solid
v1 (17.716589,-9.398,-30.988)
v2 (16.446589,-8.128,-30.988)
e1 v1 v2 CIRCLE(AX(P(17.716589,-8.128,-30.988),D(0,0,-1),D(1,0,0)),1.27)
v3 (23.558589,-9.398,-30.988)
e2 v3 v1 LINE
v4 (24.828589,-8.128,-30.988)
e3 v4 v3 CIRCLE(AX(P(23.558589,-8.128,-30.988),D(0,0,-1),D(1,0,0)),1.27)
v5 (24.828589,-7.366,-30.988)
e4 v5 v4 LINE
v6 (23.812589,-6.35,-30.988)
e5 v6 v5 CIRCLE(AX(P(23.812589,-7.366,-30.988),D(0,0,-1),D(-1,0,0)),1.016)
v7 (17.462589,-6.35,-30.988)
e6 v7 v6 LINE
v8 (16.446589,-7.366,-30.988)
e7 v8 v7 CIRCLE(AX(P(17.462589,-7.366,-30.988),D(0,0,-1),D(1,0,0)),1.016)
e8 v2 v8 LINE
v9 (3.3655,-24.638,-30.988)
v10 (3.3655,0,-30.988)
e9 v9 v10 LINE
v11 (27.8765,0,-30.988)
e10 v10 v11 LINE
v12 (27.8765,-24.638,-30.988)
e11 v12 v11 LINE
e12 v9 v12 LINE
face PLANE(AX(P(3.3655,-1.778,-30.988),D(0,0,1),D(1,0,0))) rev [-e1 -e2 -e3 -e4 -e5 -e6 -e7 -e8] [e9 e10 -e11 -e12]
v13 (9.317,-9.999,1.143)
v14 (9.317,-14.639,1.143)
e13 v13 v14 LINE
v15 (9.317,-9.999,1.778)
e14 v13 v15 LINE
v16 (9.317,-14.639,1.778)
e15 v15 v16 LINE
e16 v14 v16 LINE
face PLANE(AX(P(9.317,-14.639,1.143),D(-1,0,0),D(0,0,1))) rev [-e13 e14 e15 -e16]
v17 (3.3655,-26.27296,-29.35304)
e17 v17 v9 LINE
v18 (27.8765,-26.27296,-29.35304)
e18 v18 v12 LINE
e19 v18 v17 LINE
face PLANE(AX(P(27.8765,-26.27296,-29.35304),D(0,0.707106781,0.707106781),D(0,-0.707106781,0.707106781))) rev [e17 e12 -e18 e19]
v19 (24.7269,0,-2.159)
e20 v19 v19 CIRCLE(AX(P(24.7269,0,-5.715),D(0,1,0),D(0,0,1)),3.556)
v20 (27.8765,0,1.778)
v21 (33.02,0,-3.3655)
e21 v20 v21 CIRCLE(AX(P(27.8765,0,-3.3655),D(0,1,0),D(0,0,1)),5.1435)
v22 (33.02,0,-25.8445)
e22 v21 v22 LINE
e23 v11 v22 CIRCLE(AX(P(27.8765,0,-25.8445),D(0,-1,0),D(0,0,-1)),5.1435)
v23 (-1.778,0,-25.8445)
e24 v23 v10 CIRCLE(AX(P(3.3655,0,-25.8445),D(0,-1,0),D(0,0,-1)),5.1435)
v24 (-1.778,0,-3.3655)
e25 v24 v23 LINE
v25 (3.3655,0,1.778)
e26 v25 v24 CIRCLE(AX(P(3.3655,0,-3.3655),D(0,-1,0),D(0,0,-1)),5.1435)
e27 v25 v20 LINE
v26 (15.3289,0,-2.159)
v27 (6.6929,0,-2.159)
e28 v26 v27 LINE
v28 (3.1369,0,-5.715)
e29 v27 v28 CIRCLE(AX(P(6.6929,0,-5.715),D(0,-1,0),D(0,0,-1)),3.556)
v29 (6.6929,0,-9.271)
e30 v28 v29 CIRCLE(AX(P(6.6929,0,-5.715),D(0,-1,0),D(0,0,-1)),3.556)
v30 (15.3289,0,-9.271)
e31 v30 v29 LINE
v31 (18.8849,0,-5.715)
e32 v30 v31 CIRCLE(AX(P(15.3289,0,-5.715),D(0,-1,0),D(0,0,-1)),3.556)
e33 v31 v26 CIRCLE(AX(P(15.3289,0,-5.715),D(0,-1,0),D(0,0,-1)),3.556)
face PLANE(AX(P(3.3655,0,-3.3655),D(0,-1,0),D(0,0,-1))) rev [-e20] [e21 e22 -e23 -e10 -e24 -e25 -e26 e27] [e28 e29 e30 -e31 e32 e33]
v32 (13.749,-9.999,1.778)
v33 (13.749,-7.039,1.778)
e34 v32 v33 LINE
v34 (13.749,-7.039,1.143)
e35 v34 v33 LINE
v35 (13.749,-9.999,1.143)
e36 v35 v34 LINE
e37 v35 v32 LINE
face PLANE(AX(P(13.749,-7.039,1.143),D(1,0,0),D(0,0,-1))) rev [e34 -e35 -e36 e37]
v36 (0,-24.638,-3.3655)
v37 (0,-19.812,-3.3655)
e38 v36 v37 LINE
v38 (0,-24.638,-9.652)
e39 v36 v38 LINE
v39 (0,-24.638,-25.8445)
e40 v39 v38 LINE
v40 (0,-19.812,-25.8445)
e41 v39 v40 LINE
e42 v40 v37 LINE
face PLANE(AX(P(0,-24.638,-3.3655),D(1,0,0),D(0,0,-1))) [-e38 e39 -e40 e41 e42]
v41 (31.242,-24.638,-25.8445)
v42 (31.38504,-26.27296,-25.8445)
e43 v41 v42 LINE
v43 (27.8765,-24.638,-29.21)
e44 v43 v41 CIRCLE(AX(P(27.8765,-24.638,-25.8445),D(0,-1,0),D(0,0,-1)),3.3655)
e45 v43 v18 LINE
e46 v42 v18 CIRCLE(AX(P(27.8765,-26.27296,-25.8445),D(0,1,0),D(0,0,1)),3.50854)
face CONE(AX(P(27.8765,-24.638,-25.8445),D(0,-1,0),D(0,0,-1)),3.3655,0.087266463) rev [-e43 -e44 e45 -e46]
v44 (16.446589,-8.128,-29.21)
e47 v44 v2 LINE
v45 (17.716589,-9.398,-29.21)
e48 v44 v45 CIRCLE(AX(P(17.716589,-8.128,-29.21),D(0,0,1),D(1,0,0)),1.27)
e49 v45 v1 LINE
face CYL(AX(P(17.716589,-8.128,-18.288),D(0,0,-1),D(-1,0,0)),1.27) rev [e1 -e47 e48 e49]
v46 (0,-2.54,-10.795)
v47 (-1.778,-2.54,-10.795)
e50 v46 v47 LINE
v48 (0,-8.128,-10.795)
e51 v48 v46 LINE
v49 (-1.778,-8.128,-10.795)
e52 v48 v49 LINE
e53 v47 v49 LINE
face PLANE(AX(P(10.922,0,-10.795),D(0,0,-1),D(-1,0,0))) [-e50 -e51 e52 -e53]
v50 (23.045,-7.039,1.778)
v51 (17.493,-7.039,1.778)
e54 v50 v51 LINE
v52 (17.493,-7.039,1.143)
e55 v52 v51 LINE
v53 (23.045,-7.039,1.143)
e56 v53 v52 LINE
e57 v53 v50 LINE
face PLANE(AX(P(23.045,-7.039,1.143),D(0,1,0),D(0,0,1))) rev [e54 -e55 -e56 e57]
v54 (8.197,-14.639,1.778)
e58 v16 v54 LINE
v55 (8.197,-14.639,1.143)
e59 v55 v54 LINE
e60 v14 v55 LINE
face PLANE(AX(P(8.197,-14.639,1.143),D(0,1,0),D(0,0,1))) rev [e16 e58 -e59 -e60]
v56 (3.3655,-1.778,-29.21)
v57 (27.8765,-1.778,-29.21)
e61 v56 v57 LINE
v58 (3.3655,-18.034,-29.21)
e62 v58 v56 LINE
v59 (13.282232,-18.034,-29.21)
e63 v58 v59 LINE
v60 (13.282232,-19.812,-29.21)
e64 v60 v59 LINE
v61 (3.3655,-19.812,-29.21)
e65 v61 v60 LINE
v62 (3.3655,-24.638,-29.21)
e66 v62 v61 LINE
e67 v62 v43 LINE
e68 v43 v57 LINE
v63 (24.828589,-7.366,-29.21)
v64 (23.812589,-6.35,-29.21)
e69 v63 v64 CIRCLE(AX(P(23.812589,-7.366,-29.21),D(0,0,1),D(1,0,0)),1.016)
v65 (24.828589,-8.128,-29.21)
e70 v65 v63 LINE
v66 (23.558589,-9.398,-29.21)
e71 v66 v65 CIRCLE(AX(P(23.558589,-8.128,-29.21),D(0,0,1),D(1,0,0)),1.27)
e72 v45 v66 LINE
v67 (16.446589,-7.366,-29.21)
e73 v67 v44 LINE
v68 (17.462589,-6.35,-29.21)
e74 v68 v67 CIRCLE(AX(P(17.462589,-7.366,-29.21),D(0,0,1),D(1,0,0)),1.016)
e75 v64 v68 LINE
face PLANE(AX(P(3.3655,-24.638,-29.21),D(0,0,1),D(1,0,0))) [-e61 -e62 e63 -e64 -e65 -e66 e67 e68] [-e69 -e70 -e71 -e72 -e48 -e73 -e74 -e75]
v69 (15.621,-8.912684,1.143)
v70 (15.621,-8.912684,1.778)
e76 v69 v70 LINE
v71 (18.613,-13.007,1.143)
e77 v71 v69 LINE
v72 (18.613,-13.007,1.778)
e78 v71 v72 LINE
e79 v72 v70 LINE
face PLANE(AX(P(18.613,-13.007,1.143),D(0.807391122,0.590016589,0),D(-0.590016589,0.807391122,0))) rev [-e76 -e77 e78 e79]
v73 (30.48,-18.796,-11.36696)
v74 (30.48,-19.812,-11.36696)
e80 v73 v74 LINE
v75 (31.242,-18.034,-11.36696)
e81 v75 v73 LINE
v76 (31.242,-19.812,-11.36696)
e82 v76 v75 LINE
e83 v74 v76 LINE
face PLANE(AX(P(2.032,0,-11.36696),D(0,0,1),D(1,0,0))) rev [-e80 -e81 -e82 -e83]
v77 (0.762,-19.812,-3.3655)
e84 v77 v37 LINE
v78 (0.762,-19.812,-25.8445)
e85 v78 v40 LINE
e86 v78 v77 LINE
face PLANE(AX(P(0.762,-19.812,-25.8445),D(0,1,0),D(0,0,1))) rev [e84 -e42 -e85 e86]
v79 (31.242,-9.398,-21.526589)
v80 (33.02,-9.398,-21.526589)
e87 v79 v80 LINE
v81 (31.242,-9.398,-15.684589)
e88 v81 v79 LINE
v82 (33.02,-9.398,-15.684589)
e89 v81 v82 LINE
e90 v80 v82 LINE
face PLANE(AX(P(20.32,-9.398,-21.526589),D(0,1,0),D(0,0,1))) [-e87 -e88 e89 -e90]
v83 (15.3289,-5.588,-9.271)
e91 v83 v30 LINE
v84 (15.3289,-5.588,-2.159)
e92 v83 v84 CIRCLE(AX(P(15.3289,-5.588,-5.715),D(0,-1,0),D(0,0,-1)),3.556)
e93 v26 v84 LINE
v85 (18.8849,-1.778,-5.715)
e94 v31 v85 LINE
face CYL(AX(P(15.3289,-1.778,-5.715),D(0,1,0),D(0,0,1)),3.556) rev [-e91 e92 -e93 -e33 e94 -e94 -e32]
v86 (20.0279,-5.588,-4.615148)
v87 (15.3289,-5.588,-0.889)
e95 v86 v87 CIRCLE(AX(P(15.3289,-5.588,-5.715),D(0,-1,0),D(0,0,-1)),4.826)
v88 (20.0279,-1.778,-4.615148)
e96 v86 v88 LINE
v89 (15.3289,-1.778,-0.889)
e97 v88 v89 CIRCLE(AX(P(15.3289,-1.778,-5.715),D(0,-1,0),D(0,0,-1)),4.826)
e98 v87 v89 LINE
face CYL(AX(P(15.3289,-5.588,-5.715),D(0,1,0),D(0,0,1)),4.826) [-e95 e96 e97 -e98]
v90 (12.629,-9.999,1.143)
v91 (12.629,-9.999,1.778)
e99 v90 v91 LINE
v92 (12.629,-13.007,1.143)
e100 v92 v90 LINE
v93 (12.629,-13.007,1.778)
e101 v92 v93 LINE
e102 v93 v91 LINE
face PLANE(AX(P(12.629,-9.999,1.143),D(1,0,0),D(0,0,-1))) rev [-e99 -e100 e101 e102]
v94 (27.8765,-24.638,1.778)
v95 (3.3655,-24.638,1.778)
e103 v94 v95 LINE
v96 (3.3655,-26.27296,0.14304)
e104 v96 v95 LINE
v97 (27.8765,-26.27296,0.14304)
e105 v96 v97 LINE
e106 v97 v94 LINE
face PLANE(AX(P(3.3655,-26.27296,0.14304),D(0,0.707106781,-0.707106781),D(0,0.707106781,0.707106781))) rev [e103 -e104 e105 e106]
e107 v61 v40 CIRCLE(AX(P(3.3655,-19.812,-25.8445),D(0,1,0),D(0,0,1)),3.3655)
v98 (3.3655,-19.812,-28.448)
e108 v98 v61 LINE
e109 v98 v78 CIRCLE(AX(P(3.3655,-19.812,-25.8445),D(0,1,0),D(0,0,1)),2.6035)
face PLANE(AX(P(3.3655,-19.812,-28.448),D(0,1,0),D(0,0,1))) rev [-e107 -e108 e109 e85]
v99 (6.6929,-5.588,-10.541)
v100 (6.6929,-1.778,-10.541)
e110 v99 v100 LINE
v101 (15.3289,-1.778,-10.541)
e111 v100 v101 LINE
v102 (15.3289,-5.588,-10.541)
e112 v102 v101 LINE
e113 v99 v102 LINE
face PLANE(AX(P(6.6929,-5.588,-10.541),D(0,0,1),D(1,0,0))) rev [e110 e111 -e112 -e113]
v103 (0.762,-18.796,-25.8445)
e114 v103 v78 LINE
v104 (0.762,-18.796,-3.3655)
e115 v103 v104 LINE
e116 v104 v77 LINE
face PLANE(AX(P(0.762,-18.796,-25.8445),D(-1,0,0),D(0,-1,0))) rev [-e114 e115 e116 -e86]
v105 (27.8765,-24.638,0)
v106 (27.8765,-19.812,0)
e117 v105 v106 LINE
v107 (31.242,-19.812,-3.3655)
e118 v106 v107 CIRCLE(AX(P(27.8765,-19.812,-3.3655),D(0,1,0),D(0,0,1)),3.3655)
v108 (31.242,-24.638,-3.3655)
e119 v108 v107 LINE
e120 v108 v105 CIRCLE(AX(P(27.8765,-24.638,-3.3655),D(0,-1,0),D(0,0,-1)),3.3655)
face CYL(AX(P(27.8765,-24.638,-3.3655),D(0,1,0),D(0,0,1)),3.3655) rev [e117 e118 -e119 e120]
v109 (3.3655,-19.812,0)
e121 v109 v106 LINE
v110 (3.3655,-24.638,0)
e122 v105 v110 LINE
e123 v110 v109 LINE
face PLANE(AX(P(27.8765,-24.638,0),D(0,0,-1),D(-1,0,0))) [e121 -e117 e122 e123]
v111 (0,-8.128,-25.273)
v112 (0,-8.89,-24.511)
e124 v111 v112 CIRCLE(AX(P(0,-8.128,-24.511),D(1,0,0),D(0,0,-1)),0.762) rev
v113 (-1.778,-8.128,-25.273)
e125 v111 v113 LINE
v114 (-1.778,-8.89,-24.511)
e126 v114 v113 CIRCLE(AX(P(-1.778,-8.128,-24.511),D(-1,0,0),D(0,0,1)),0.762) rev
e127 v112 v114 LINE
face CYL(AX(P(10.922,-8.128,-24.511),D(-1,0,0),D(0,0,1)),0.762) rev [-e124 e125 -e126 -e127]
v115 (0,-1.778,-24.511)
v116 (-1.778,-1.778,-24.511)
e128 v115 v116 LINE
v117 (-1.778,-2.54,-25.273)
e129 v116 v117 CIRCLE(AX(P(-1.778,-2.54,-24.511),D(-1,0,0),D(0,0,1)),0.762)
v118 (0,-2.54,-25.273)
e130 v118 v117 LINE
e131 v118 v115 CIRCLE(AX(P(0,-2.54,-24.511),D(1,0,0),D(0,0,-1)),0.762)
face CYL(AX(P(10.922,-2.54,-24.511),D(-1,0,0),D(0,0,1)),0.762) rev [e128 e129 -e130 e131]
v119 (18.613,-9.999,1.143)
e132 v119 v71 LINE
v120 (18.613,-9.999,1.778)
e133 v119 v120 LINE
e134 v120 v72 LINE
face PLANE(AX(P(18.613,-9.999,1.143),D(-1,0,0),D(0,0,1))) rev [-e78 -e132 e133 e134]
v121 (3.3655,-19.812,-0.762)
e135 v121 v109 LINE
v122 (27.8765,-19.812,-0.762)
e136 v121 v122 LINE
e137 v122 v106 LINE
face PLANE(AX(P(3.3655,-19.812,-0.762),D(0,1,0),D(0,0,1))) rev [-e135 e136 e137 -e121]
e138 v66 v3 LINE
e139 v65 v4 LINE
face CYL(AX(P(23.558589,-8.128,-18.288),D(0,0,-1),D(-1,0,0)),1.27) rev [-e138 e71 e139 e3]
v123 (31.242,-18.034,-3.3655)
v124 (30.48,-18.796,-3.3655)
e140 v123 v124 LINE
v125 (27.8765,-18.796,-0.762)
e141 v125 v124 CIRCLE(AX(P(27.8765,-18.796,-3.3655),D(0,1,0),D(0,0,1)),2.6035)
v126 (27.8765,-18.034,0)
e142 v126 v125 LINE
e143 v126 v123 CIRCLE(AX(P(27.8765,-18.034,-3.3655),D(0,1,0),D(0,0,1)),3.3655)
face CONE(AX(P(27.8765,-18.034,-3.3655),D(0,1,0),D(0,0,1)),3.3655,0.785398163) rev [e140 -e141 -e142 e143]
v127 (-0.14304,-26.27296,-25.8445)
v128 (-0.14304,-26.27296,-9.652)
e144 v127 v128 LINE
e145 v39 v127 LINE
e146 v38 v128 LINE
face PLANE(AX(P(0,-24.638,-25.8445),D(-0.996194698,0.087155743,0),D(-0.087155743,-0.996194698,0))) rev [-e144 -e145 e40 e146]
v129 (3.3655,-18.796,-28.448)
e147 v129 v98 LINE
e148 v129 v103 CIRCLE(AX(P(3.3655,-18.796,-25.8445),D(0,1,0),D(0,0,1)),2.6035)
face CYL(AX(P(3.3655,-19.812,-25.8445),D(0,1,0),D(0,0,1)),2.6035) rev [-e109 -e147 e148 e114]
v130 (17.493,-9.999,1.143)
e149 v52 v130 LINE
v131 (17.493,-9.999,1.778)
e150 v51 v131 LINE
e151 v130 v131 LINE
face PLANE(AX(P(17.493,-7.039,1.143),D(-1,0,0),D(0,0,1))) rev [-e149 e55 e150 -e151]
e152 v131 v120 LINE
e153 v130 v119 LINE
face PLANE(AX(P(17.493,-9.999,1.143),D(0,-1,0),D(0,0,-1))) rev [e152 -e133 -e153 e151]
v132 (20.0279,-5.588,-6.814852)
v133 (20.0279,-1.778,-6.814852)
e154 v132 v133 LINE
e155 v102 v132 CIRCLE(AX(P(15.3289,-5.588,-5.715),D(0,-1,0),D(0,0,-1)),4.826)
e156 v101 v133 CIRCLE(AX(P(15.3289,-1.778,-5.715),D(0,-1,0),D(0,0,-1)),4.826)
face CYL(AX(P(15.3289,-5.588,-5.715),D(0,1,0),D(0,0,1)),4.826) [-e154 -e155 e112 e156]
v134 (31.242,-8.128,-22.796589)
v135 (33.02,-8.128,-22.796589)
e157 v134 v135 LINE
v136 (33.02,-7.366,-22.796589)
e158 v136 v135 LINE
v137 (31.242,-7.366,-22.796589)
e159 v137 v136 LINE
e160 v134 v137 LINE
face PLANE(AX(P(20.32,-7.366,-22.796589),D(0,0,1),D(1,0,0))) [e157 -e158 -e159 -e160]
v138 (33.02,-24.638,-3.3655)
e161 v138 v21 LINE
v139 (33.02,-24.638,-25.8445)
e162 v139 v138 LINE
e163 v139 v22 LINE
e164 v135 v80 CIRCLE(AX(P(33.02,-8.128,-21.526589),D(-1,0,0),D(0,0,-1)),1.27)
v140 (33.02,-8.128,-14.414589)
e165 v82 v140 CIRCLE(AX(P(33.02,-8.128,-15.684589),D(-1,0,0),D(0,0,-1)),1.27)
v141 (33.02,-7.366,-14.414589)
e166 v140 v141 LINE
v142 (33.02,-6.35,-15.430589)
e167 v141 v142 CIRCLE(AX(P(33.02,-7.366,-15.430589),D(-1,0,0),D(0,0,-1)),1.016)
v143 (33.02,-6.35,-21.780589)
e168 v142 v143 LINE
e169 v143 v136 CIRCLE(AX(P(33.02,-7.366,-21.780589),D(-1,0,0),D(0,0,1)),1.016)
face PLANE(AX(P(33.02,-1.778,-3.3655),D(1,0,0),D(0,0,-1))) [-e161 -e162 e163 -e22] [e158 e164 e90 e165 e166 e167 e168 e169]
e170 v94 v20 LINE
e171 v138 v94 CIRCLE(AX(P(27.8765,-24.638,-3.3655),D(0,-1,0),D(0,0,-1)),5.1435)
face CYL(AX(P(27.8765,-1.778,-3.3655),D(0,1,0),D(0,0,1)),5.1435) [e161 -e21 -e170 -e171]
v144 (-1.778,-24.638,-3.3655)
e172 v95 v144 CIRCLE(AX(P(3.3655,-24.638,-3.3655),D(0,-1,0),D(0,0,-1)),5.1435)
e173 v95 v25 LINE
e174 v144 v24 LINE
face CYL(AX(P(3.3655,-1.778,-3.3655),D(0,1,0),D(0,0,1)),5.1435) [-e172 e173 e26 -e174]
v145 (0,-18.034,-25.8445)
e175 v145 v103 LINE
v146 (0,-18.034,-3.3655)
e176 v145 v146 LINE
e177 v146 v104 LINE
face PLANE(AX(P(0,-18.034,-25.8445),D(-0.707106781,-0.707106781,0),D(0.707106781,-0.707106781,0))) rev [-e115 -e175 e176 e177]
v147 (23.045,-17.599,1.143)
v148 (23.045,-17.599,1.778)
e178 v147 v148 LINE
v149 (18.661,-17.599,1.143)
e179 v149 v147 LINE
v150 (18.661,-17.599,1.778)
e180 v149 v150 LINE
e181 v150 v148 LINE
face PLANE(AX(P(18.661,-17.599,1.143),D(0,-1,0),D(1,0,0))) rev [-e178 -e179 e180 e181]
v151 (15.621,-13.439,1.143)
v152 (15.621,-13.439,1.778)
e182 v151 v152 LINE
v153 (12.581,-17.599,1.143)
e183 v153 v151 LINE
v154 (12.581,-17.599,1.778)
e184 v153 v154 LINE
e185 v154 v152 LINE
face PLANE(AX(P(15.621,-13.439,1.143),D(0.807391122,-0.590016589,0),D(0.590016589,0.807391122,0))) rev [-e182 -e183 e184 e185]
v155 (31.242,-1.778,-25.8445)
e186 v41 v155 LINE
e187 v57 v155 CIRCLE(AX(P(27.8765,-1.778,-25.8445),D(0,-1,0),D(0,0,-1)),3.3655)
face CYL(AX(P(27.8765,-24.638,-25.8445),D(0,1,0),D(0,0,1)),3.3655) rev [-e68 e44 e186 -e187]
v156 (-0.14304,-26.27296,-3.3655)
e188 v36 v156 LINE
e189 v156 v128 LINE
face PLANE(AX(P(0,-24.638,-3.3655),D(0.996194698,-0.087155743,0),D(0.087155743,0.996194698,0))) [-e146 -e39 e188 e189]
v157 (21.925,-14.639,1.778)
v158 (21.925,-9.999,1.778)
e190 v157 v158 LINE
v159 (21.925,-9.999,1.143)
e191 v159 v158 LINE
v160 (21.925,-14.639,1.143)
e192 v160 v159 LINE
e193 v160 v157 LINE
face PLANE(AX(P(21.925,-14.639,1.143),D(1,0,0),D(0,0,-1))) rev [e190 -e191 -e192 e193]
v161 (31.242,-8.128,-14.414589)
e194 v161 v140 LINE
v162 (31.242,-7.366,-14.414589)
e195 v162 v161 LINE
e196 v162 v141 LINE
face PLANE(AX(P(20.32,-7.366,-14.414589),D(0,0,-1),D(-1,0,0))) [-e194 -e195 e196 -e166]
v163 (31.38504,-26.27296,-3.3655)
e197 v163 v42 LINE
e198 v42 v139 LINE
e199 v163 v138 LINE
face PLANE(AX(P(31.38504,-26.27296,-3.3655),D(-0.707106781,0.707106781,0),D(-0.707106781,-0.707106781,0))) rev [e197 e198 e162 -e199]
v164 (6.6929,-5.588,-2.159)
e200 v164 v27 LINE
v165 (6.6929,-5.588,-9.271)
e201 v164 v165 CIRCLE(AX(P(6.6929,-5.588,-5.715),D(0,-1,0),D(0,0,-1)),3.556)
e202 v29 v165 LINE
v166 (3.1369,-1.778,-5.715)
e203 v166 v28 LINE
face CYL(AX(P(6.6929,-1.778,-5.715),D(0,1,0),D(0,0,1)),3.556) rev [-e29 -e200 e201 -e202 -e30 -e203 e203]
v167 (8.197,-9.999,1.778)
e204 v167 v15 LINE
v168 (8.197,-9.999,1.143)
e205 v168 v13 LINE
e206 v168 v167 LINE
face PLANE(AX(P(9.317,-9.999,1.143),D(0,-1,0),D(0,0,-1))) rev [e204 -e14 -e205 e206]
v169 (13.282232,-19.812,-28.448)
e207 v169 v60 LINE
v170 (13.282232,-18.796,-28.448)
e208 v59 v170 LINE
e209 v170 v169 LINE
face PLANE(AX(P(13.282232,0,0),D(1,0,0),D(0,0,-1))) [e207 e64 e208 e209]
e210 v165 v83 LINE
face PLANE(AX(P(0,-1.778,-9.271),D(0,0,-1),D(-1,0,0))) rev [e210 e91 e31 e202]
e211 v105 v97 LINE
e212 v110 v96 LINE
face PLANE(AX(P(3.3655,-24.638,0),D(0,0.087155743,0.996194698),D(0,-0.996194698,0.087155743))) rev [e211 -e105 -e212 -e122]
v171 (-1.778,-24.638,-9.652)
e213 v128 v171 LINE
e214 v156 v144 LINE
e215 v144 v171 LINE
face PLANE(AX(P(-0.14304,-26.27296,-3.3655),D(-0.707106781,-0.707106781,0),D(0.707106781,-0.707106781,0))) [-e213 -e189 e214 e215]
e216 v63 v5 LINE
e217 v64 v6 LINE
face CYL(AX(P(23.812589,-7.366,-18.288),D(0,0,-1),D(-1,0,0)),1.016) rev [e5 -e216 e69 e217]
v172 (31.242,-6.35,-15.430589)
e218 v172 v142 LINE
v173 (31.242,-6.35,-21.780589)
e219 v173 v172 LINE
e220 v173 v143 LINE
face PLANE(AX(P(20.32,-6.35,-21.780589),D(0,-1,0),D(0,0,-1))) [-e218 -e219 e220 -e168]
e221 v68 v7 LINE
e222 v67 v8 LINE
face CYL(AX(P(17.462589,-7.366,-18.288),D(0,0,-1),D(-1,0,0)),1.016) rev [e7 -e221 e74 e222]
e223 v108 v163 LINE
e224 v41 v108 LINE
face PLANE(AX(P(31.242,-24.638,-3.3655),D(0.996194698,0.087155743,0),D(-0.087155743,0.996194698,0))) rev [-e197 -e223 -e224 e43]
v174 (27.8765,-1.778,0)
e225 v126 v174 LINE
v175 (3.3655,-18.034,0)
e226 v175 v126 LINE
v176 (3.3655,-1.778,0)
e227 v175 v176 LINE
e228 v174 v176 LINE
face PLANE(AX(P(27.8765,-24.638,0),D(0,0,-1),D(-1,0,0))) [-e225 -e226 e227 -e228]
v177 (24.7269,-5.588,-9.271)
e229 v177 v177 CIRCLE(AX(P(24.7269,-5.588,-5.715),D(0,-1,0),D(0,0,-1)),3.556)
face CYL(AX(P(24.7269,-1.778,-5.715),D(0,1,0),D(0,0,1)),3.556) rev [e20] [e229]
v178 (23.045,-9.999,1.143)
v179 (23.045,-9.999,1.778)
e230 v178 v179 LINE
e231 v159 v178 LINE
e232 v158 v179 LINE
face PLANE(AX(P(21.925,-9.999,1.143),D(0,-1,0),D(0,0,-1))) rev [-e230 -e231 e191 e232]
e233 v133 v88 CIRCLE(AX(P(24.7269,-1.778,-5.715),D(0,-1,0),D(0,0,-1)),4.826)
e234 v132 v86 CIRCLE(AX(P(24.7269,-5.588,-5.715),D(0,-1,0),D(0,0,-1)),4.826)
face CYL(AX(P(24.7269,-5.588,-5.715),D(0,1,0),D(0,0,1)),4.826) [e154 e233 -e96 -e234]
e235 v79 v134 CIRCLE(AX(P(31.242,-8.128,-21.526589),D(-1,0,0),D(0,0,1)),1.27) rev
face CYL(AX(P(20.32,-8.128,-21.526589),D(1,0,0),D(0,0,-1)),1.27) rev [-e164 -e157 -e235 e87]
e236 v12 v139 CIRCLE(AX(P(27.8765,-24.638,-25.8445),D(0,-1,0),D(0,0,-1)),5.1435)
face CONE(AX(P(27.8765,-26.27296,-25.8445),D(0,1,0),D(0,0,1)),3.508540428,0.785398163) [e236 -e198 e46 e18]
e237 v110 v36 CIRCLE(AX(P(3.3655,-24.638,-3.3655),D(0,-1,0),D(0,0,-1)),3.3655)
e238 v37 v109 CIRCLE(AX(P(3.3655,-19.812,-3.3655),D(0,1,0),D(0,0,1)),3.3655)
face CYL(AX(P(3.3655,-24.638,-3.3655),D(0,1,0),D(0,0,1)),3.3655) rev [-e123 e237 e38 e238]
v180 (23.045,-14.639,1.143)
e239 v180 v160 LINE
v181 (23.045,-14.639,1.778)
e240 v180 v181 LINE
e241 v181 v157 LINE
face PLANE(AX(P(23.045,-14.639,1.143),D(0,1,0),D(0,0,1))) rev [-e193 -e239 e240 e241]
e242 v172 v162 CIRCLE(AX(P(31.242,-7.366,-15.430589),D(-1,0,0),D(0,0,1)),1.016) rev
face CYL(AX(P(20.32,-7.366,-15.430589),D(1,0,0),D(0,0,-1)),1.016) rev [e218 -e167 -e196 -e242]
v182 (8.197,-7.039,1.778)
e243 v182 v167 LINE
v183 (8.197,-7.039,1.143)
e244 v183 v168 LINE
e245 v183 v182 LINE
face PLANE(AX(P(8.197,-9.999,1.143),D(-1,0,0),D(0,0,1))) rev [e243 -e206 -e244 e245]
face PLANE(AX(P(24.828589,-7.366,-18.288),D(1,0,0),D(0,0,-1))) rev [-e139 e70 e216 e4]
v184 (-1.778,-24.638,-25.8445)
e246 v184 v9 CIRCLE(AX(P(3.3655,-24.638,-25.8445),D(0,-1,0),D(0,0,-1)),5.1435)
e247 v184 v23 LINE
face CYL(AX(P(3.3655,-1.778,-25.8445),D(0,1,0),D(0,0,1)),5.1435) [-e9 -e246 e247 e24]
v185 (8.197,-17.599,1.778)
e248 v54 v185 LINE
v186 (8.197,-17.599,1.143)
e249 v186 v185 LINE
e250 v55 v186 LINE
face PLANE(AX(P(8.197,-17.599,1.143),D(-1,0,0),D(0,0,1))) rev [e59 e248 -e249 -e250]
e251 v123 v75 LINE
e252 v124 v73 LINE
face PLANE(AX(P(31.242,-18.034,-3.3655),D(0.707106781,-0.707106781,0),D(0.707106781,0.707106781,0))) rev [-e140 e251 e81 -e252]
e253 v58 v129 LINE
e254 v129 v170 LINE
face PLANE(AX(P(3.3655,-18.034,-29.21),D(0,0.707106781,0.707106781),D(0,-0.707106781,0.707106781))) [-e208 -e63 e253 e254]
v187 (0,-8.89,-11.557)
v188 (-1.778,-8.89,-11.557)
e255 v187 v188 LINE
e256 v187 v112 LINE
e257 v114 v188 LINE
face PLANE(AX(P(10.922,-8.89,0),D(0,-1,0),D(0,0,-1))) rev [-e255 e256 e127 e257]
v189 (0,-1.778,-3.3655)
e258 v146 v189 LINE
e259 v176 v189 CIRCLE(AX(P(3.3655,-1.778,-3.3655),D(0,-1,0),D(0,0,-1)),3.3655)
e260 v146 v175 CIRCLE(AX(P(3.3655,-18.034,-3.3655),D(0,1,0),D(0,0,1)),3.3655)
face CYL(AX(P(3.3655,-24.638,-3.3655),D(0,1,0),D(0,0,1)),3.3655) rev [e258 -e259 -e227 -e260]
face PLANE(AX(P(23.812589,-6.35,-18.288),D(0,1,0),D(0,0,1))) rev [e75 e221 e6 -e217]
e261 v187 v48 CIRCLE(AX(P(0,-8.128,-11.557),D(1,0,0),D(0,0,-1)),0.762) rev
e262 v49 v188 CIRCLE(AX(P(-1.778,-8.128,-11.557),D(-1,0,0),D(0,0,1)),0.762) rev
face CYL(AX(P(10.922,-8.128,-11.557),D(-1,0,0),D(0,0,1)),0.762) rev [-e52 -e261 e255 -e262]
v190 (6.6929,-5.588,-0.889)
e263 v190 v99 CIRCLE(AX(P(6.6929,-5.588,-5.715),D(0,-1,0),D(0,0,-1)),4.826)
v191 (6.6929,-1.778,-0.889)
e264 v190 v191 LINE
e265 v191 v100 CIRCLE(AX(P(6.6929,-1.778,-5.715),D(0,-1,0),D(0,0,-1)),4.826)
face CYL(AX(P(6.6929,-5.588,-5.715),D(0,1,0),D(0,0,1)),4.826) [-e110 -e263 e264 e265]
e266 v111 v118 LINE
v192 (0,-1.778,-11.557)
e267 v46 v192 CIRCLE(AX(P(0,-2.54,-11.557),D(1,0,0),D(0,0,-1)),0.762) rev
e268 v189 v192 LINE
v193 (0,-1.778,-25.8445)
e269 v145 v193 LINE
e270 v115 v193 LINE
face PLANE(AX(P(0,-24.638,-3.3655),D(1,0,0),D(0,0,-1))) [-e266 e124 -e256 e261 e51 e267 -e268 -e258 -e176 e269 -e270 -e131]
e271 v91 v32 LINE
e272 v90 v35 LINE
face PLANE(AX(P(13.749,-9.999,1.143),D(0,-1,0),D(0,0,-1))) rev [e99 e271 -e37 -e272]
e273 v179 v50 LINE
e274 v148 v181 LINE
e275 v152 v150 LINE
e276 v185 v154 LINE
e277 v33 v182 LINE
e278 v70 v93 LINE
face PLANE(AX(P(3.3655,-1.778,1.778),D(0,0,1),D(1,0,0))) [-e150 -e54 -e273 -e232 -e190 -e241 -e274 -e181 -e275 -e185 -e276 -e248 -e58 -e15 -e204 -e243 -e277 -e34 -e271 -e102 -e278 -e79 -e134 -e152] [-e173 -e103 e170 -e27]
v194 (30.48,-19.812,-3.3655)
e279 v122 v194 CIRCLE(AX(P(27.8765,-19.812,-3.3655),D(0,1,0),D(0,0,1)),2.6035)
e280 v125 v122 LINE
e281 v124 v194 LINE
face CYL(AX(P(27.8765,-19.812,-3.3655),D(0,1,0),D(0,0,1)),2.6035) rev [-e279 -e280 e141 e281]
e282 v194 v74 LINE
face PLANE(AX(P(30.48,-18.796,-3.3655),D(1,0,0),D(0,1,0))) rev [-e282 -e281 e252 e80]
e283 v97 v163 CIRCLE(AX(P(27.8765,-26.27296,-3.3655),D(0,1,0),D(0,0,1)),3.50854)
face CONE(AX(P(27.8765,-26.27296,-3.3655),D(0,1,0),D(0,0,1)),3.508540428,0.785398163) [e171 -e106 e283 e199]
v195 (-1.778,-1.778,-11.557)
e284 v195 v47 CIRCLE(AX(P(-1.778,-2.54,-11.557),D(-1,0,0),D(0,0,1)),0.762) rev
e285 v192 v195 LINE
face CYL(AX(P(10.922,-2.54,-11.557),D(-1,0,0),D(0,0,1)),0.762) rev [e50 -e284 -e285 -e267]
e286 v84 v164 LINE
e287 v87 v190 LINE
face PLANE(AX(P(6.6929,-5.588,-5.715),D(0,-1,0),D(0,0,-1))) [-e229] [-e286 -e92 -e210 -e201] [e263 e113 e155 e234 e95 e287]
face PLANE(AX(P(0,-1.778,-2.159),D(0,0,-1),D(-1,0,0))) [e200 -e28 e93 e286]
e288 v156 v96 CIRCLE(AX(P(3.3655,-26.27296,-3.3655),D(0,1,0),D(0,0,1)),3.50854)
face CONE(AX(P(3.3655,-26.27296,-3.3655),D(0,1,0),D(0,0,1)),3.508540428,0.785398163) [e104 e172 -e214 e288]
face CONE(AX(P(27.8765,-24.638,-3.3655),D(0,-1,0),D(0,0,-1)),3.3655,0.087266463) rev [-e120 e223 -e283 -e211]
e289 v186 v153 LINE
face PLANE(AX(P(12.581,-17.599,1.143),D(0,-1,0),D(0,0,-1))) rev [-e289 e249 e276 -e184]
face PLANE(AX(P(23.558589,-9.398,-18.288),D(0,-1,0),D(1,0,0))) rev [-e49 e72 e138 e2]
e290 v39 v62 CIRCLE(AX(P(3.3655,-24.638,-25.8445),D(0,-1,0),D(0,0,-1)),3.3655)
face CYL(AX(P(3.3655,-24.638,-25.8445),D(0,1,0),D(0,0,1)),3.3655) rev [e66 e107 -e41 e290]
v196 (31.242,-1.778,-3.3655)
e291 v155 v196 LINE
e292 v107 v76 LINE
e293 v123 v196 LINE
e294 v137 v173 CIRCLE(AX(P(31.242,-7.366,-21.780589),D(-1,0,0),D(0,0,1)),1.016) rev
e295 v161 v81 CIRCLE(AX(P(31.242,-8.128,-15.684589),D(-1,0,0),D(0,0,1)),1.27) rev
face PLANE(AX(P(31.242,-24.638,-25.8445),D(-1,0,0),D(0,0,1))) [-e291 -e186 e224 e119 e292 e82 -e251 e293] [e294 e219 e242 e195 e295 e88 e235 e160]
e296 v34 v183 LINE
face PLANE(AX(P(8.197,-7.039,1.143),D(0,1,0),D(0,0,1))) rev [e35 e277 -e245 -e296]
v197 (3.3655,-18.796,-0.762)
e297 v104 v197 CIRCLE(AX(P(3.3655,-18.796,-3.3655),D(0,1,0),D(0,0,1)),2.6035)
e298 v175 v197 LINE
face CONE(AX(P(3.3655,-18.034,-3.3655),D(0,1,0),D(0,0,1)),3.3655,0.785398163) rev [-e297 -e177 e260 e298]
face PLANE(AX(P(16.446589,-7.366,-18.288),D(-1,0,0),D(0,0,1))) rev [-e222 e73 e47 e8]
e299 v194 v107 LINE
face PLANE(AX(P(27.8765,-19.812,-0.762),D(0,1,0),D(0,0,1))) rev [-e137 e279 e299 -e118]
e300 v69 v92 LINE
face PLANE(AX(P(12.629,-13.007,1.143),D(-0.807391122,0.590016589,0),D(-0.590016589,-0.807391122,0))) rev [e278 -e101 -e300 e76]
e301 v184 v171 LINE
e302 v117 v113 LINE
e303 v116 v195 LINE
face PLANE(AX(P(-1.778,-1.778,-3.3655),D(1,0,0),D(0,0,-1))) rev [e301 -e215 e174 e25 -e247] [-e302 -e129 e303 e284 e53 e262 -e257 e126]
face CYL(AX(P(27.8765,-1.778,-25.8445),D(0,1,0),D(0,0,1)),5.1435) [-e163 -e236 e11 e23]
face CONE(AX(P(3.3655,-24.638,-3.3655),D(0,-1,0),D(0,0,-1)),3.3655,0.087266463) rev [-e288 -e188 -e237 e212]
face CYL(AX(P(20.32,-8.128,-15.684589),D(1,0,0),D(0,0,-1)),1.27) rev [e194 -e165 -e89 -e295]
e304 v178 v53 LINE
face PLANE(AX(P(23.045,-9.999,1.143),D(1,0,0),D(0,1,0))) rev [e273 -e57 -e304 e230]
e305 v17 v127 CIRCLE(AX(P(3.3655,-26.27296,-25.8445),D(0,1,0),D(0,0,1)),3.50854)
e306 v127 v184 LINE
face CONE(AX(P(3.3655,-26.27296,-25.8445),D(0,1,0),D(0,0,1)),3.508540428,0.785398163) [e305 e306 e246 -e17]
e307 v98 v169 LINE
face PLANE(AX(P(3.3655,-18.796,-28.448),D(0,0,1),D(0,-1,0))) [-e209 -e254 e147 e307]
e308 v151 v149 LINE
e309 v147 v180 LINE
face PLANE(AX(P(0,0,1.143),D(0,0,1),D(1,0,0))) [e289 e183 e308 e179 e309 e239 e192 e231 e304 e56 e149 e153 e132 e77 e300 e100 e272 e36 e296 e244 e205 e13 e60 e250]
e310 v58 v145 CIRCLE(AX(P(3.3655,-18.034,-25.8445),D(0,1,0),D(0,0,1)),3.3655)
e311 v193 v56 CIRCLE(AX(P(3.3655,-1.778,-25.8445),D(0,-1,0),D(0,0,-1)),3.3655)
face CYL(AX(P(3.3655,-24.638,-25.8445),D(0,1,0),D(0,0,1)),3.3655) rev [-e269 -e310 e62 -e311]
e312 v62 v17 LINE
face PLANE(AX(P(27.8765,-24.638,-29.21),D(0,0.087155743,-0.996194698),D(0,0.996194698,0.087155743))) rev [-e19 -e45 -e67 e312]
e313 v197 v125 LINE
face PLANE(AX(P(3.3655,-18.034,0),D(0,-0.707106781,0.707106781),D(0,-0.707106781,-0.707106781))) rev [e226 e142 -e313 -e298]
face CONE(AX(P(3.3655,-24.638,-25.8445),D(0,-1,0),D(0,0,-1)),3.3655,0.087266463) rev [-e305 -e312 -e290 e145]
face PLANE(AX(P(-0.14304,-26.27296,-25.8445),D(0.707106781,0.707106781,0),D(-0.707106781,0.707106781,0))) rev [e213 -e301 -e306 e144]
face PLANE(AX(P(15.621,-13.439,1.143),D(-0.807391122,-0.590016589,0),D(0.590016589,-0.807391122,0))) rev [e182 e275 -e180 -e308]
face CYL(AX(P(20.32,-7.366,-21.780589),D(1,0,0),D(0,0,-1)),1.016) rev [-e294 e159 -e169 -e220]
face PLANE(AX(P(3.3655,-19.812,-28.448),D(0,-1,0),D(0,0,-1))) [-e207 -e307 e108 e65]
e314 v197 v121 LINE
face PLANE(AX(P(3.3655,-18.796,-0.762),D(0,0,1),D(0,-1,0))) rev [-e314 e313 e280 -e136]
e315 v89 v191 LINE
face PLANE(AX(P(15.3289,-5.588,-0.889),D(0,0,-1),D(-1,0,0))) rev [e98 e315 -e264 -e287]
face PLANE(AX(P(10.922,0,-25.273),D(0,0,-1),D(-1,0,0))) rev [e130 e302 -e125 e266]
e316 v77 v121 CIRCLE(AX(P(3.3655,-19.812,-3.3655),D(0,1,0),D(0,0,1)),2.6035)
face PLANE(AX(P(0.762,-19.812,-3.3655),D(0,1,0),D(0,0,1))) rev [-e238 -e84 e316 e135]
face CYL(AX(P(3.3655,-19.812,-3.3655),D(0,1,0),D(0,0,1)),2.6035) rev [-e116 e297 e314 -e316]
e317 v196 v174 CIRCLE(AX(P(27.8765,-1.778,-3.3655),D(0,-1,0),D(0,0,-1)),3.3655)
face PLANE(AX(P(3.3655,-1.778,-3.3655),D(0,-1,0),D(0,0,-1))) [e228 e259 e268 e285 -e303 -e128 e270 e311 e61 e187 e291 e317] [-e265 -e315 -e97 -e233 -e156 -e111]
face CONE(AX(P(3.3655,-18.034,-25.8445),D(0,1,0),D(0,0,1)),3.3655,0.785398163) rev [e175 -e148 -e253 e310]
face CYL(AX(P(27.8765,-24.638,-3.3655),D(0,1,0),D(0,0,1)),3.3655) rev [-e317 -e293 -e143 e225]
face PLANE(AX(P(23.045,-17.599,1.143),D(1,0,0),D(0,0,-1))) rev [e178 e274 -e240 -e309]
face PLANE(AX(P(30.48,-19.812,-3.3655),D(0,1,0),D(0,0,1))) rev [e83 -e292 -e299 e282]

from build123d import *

# Parameters (mm, degrees)
BOSS_EXTRUDE1_DEPTH = 1.778
BOSS_EXTRUDE2_DEPTH = 22.86
SKETCH5_R           = 3.556
SKETCH5_W           = 15.748
SKETCH5_H           = 7.112
CUT_EXTRUDE1_DEPTH  = 1.778
FILLET1_R           = 3.556
CUT_EXTRUDE2_DEPTH  = 12.7
CUT_EXTRUDE3_DEPTH  = 12.7
SKETCH9_R           = 3.556
BOSS_EXTRUDE3_DEPTH = 3.81
CUT_EXTRUDE4_DEPTH  = 0.635


with BuildPart() as part:
    # Sketch1 → Boss-Extrude1 (new body)
    with BuildSketch(Plane(origin=(0, 0, 0), x_dir=(1, 0, 0), z_dir=(0, 1, 0))):
        with BuildLine():
            Line((-1.778, 3.3655), (-1.778, 25.8445))
            ThreePointArc((-1.778, 25.8445), (-0.271503729, 29.481503729), (3.3655, 30.988))
            Line((3.3655, 30.988), (27.8765, 30.988))
            ThreePointArc((27.8765, 30.988), (31.513503729, 29.481503729), (33.02, 25.8445))
            Line((33.02, 25.8445), (33.02, 3.3655))
            ThreePointArc((33.02, 3.3655), (31.513503729, -0.271503729), (27.8765, -1.778))
            Line((27.8765, -1.778), (3.3655, -1.778))
            ThreePointArc((3.3655, -1.778), (-0.271503729, -0.271503729), (-1.778, 3.3655))
        make_face()
    extrude(amount=-BOSS_EXTRUDE1_DEPTH)

    # Sketch3 → Boss-Extrude2 (add)
    with BuildSketch(Plane.XZ.offset(1.778)):
        with BuildLine():
            Line((27.8765, 1.778), (3.3655, 1.778))
            ThreePointArc((3.3655, 1.778), (-0.271503729, 0.271503729), (-1.778, -3.3655))
            Line((-1.778, -3.3655), (-1.778, -25.8445))
            ThreePointArc((-1.778, -25.8445), (-0.271503729, -29.481503729), (3.3655, -30.988))
            Line((3.3655, -30.988), (27.8765, -30.988))
            ThreePointArc((27.8765, -30.988), (31.513503729, -29.481503729), (33.02, -25.8445))
            Line((33.02, -25.8445), (33.02, -3.3655))
            ThreePointArc((33.02, -3.3655), (31.513503729, 0.271503729), (27.8765, 1.778))
        make_face()
        with BuildLine():
            Line((0, -3.3655), (0, -25.8445))
            ThreePointArc((0, -25.8445), (0.985732128, -28.224267872), (3.3655, -29.21))
            Line((3.3655, -29.21), (27.8765, -29.21))
            ThreePointArc((27.8765, -29.21), (30.256267872, -28.224267872), (31.242, -25.8445))
            Line((31.242, -25.8445), (31.242, -3.3655))
            ThreePointArc((31.242, -3.3655), (30.256267872, -0.985732128), (27.8765, 0))
            Line((27.8765, 0), (3.3655, 0))
            ThreePointArc((3.3655, 0), (0.985732128, -0.985732128), (0, -3.3655))
        make_face(mode=Mode.SUBTRACT)
    extrude(amount=BOSS_EXTRUDE2_DEPTH)

    # Sketch5 → Cut-Extrude1 (cut)
    with BuildSketch(Plane(origin=(0, 0, 0), x_dir=(1, 0, 0), z_dir=(0, 1, 0))):
        with Locations(Location((24.7269, 5.715, 0), (0, 0, 270))):
            Circle(SKETCH5_R)
        with Locations((11.0109, 5.715)):
            Rectangle(SKETCH5_W, SKETCH5_H)
    extrude(amount=-CUT_EXTRUDE1_DEPTH, mode=Mode.SUBTRACT)

    # Fillet1
    fillet1_edges = [part.edges().sort_by_distance(p)[0] for p in [
        (3.1369, -0.889, -2.159),
        (18.8849, -0.889, -2.159),
        (18.8849, -0.889, -9.271),
        (3.1369, -0.889, -9.271),
    ]]
    fillet(fillet1_edges, radius=FILLET1_R - 0.0001)  # a hair under: the kernel refuses the full size

    # Sketch6 → Cut-Extrude2 (cut)
    with BuildSketch(Plane.ZY.offset(1.778)):
        with BuildLine():
            Line((-11.557, -1.778), (-24.511, -1.778))
            ThreePointArc((-24.511, -1.778), (-25.049815367, -2.001184633), (-25.273, -2.54))
            Line((-25.273, -2.54), (-25.273, -8.128))
            ThreePointArc((-25.273, -8.128), (-25.049815367, -8.666815367), (-24.511, -8.89))
            Line((-24.511, -8.89), (-11.557, -8.89))
            ThreePointArc((-11.557, -8.89), (-11.018184633, -8.666815367), (-10.795, -8.128))
            Line((-10.795, -8.128), (-10.795, -2.54))
            ThreePointArc((-10.795, -2.54), (-11.018184633, -2.001184633), (-11.557, -1.778))
        make_face()
    extrude(amount=-CUT_EXTRUDE2_DEPTH, mode=Mode.SUBTRACT)

    # Sketch7 → Cut-Extrude3 (cut)
    with BuildSketch(Plane(origin=(0, 0, -30.988), x_dir=(-1, 0, 0), z_dir=(0, 0, -1))):
        with BuildLine():
            Line((-23.8125889, -6.35), (-17.4625889, -6.35))
            ThreePointArc((-17.4625889, -6.35), (-16.74416841, -6.64757951), (-16.4465889, -7.366))
            Line((-16.4465889, -7.366), (-16.4465889, -8.128))
            ThreePointArc((-16.4465889, -8.128), (-16.818563288, -9.026025612), (-17.7165889, -9.398))
            Line((-17.7165889, -9.398), (-23.5585889, -9.398))
            ThreePointArc((-23.5585889, -9.398), (-24.456614512, -9.026025612), (-24.8285889, -8.128))
            Line((-24.8285889, -8.128), (-24.8285889, -7.366))
            ThreePointArc((-24.8285889, -7.366), (-24.53100939, -6.64757951), (-23.8125889, -6.35))
        make_face()
    cut_extrude3 = extrude(amount=-CUT_EXTRUDE3_DEPTH, mode=Mode.SUBTRACT)

    # Mirror1: Cut-Extrude3 across plane
    add(cut_extrude3.mirror(Plane(origin=(1.016, 0, 1.016), x_dir=(-0.7071067811865437, 0, 0.7071067811865512), z_dir=(-0.7071067811865512, 0, -0.7071067811865438))), mode=Mode.SUBTRACT)

    # Sketch9 → Boss-Extrude3 (add)
    with BuildSketch(Plane.XZ.offset(1.778)):
        with BuildLine():
            Line((6.6929, -10.541), (15.3289, -10.541))
            ThreePointArc((15.3289, -10.541), (18.327432056, -9.496412634), (20.0279, -6.814852263))
            ThreePointArc((20.0279, -6.814852263), (29.5529, -5.715), (20.0279, -4.615147737))
            ThreePointArc((20.0279, -4.615147737), (18.327432056, -1.933587366), (15.3289, -0.889))
            Line((15.3289, -0.889), (6.6929, -0.889))
            ThreePointArc((6.6929, -0.889), (3.280402674, -2.302502674), (1.8669, -5.715))
            ThreePointArc((1.8669, -5.715), (3.280402674, -9.127497326), (6.6929, -10.541))
        make_face()
        with Locations(Location((24.7269, -5.715, 0), (0, 0, 90))):
            Circle(SKETCH9_R, mode=Mode.SUBTRACT)
        with BuildLine():
            Line((6.6929, -9.271), (15.3289, -9.271))
            ThreePointArc((15.3289, -9.271), (17.843371714, -8.229471714), (18.8849, -5.715))
            ThreePointArc((18.8849, -5.715), (17.843371714, -3.200528286), (15.3289, -2.159))
            Line((15.3289, -2.159), (6.6929, -2.159))
            ThreePointArc((6.6929, -2.159), (4.178428286, -3.200528286), (3.1369, -5.715))
            ThreePointArc((3.1369, -5.715), (4.178428286, -8.229471714), (6.6929, -9.271))
        make_face(mode=Mode.SUBTRACT)
    extrude(amount=BOSS_EXTRUDE3_DEPTH)

    # Sweep1: sweep along a path in Sketch12
    with BuildLine(Plane.XZ.offset(24.638)) as sweep1_path:
        Line((31.242, -25.8445), (31.242, -3.3655))
        ThreePointArc((31.242, -3.3655), (30.256267872, -0.985732128), (27.8765, 0))
        Line((27.8765, 0), (3.3655, 0))
        ThreePointArc((3.3655, 0), (0.985732128, -0.985732128), (0, -3.3655))
        Line((0, -3.3655), (0, -25.8445))
        ThreePointArc((0, -25.8445), (0.985732128, -28.224267872), (3.3655, -29.21))
        Line((3.3655, -29.21), (27.8765, -29.21))
        ThreePointArc((27.8765, -29.21), (30.256267872, -28.224267872), (31.242, -25.8445))
    # Sketch11 → Sweep1 (sweep)
    with BuildSketch(Plane(origin=(0, 0, -9.652), x_dir=(-1, 0, 0), z_dir=(0, 0, -1))):
        Polygon((1.778, -24.638), (0, -24.638), (0.143040428, -26.272959572), align=None)
    sweep(path=sweep1_path.line)

    # Sweep2: sweep along a path in Sketch14
    with BuildLine(Plane(origin=(0, -19.812, 0), x_dir=(-1, 0, 0), z_dir=(0, -1, 0))) as sweep2_path:
        Line((-13.282231977, 29.21), (-3.3655, 29.21))
        ThreePointArc((-3.3655, 29.21), (-0.985732128, 28.224267872), (0, 25.8445))
        Line((0, 25.8445), (0, 3.3655))
        ThreePointArc((0, 3.3655), (-0.985732128, 0.985732128), (-3.3655, 0))
        Line((-3.3655, 0), (-27.8765, 0))
        ThreePointArc((-27.8765, 0), (-30.256267872, 0.985732128), (-31.242, 3.3655))
        Line((-31.242, 3.3655), (-31.242, 11.366960451))
    # Sketch15 → Sweep2 (sweep)
    with BuildSketch(Plane(origin=(13.282231977, 0, 0), x_dir=(0, 0, -1), z_dir=(1, 0, 0))):
        Polygon((29.21, -19.812), (29.21, -18.034), (28.448, -18.796), (28.448, -19.812), align=None)
    sweep(path=sweep2_path.line)

    # Sketch16 → Cut-Extrude4 (cut)
    with BuildSketch(Plane.XY.offset(1.778)):
        Polygon((23.045, -17.599), (23.045, -14.639), (21.925, -14.639), (21.925, -9.999), (23.045, -9.999), (23.045, -7.039), (17.493, -7.039), (17.493, -9.999), (18.613, -9.999), (18.613, -13.007), (15.621, -8.912684211), (12.629, -13.007), (12.629, -9.999), (13.749, -9.999), (13.749, -7.039), (8.197, -7.039), (8.197, -9.999), (9.317, -9.999), (9.317, -14.639), (8.197, -14.639), (8.197, -17.599), (12.581, -17.599), (15.621, -13.439), (18.661, -17.599), align=None)
    extrude(amount=-CUT_EXTRUDE4_DEPTH, mode=Mode.SUBTRACT)


solid = part.part
